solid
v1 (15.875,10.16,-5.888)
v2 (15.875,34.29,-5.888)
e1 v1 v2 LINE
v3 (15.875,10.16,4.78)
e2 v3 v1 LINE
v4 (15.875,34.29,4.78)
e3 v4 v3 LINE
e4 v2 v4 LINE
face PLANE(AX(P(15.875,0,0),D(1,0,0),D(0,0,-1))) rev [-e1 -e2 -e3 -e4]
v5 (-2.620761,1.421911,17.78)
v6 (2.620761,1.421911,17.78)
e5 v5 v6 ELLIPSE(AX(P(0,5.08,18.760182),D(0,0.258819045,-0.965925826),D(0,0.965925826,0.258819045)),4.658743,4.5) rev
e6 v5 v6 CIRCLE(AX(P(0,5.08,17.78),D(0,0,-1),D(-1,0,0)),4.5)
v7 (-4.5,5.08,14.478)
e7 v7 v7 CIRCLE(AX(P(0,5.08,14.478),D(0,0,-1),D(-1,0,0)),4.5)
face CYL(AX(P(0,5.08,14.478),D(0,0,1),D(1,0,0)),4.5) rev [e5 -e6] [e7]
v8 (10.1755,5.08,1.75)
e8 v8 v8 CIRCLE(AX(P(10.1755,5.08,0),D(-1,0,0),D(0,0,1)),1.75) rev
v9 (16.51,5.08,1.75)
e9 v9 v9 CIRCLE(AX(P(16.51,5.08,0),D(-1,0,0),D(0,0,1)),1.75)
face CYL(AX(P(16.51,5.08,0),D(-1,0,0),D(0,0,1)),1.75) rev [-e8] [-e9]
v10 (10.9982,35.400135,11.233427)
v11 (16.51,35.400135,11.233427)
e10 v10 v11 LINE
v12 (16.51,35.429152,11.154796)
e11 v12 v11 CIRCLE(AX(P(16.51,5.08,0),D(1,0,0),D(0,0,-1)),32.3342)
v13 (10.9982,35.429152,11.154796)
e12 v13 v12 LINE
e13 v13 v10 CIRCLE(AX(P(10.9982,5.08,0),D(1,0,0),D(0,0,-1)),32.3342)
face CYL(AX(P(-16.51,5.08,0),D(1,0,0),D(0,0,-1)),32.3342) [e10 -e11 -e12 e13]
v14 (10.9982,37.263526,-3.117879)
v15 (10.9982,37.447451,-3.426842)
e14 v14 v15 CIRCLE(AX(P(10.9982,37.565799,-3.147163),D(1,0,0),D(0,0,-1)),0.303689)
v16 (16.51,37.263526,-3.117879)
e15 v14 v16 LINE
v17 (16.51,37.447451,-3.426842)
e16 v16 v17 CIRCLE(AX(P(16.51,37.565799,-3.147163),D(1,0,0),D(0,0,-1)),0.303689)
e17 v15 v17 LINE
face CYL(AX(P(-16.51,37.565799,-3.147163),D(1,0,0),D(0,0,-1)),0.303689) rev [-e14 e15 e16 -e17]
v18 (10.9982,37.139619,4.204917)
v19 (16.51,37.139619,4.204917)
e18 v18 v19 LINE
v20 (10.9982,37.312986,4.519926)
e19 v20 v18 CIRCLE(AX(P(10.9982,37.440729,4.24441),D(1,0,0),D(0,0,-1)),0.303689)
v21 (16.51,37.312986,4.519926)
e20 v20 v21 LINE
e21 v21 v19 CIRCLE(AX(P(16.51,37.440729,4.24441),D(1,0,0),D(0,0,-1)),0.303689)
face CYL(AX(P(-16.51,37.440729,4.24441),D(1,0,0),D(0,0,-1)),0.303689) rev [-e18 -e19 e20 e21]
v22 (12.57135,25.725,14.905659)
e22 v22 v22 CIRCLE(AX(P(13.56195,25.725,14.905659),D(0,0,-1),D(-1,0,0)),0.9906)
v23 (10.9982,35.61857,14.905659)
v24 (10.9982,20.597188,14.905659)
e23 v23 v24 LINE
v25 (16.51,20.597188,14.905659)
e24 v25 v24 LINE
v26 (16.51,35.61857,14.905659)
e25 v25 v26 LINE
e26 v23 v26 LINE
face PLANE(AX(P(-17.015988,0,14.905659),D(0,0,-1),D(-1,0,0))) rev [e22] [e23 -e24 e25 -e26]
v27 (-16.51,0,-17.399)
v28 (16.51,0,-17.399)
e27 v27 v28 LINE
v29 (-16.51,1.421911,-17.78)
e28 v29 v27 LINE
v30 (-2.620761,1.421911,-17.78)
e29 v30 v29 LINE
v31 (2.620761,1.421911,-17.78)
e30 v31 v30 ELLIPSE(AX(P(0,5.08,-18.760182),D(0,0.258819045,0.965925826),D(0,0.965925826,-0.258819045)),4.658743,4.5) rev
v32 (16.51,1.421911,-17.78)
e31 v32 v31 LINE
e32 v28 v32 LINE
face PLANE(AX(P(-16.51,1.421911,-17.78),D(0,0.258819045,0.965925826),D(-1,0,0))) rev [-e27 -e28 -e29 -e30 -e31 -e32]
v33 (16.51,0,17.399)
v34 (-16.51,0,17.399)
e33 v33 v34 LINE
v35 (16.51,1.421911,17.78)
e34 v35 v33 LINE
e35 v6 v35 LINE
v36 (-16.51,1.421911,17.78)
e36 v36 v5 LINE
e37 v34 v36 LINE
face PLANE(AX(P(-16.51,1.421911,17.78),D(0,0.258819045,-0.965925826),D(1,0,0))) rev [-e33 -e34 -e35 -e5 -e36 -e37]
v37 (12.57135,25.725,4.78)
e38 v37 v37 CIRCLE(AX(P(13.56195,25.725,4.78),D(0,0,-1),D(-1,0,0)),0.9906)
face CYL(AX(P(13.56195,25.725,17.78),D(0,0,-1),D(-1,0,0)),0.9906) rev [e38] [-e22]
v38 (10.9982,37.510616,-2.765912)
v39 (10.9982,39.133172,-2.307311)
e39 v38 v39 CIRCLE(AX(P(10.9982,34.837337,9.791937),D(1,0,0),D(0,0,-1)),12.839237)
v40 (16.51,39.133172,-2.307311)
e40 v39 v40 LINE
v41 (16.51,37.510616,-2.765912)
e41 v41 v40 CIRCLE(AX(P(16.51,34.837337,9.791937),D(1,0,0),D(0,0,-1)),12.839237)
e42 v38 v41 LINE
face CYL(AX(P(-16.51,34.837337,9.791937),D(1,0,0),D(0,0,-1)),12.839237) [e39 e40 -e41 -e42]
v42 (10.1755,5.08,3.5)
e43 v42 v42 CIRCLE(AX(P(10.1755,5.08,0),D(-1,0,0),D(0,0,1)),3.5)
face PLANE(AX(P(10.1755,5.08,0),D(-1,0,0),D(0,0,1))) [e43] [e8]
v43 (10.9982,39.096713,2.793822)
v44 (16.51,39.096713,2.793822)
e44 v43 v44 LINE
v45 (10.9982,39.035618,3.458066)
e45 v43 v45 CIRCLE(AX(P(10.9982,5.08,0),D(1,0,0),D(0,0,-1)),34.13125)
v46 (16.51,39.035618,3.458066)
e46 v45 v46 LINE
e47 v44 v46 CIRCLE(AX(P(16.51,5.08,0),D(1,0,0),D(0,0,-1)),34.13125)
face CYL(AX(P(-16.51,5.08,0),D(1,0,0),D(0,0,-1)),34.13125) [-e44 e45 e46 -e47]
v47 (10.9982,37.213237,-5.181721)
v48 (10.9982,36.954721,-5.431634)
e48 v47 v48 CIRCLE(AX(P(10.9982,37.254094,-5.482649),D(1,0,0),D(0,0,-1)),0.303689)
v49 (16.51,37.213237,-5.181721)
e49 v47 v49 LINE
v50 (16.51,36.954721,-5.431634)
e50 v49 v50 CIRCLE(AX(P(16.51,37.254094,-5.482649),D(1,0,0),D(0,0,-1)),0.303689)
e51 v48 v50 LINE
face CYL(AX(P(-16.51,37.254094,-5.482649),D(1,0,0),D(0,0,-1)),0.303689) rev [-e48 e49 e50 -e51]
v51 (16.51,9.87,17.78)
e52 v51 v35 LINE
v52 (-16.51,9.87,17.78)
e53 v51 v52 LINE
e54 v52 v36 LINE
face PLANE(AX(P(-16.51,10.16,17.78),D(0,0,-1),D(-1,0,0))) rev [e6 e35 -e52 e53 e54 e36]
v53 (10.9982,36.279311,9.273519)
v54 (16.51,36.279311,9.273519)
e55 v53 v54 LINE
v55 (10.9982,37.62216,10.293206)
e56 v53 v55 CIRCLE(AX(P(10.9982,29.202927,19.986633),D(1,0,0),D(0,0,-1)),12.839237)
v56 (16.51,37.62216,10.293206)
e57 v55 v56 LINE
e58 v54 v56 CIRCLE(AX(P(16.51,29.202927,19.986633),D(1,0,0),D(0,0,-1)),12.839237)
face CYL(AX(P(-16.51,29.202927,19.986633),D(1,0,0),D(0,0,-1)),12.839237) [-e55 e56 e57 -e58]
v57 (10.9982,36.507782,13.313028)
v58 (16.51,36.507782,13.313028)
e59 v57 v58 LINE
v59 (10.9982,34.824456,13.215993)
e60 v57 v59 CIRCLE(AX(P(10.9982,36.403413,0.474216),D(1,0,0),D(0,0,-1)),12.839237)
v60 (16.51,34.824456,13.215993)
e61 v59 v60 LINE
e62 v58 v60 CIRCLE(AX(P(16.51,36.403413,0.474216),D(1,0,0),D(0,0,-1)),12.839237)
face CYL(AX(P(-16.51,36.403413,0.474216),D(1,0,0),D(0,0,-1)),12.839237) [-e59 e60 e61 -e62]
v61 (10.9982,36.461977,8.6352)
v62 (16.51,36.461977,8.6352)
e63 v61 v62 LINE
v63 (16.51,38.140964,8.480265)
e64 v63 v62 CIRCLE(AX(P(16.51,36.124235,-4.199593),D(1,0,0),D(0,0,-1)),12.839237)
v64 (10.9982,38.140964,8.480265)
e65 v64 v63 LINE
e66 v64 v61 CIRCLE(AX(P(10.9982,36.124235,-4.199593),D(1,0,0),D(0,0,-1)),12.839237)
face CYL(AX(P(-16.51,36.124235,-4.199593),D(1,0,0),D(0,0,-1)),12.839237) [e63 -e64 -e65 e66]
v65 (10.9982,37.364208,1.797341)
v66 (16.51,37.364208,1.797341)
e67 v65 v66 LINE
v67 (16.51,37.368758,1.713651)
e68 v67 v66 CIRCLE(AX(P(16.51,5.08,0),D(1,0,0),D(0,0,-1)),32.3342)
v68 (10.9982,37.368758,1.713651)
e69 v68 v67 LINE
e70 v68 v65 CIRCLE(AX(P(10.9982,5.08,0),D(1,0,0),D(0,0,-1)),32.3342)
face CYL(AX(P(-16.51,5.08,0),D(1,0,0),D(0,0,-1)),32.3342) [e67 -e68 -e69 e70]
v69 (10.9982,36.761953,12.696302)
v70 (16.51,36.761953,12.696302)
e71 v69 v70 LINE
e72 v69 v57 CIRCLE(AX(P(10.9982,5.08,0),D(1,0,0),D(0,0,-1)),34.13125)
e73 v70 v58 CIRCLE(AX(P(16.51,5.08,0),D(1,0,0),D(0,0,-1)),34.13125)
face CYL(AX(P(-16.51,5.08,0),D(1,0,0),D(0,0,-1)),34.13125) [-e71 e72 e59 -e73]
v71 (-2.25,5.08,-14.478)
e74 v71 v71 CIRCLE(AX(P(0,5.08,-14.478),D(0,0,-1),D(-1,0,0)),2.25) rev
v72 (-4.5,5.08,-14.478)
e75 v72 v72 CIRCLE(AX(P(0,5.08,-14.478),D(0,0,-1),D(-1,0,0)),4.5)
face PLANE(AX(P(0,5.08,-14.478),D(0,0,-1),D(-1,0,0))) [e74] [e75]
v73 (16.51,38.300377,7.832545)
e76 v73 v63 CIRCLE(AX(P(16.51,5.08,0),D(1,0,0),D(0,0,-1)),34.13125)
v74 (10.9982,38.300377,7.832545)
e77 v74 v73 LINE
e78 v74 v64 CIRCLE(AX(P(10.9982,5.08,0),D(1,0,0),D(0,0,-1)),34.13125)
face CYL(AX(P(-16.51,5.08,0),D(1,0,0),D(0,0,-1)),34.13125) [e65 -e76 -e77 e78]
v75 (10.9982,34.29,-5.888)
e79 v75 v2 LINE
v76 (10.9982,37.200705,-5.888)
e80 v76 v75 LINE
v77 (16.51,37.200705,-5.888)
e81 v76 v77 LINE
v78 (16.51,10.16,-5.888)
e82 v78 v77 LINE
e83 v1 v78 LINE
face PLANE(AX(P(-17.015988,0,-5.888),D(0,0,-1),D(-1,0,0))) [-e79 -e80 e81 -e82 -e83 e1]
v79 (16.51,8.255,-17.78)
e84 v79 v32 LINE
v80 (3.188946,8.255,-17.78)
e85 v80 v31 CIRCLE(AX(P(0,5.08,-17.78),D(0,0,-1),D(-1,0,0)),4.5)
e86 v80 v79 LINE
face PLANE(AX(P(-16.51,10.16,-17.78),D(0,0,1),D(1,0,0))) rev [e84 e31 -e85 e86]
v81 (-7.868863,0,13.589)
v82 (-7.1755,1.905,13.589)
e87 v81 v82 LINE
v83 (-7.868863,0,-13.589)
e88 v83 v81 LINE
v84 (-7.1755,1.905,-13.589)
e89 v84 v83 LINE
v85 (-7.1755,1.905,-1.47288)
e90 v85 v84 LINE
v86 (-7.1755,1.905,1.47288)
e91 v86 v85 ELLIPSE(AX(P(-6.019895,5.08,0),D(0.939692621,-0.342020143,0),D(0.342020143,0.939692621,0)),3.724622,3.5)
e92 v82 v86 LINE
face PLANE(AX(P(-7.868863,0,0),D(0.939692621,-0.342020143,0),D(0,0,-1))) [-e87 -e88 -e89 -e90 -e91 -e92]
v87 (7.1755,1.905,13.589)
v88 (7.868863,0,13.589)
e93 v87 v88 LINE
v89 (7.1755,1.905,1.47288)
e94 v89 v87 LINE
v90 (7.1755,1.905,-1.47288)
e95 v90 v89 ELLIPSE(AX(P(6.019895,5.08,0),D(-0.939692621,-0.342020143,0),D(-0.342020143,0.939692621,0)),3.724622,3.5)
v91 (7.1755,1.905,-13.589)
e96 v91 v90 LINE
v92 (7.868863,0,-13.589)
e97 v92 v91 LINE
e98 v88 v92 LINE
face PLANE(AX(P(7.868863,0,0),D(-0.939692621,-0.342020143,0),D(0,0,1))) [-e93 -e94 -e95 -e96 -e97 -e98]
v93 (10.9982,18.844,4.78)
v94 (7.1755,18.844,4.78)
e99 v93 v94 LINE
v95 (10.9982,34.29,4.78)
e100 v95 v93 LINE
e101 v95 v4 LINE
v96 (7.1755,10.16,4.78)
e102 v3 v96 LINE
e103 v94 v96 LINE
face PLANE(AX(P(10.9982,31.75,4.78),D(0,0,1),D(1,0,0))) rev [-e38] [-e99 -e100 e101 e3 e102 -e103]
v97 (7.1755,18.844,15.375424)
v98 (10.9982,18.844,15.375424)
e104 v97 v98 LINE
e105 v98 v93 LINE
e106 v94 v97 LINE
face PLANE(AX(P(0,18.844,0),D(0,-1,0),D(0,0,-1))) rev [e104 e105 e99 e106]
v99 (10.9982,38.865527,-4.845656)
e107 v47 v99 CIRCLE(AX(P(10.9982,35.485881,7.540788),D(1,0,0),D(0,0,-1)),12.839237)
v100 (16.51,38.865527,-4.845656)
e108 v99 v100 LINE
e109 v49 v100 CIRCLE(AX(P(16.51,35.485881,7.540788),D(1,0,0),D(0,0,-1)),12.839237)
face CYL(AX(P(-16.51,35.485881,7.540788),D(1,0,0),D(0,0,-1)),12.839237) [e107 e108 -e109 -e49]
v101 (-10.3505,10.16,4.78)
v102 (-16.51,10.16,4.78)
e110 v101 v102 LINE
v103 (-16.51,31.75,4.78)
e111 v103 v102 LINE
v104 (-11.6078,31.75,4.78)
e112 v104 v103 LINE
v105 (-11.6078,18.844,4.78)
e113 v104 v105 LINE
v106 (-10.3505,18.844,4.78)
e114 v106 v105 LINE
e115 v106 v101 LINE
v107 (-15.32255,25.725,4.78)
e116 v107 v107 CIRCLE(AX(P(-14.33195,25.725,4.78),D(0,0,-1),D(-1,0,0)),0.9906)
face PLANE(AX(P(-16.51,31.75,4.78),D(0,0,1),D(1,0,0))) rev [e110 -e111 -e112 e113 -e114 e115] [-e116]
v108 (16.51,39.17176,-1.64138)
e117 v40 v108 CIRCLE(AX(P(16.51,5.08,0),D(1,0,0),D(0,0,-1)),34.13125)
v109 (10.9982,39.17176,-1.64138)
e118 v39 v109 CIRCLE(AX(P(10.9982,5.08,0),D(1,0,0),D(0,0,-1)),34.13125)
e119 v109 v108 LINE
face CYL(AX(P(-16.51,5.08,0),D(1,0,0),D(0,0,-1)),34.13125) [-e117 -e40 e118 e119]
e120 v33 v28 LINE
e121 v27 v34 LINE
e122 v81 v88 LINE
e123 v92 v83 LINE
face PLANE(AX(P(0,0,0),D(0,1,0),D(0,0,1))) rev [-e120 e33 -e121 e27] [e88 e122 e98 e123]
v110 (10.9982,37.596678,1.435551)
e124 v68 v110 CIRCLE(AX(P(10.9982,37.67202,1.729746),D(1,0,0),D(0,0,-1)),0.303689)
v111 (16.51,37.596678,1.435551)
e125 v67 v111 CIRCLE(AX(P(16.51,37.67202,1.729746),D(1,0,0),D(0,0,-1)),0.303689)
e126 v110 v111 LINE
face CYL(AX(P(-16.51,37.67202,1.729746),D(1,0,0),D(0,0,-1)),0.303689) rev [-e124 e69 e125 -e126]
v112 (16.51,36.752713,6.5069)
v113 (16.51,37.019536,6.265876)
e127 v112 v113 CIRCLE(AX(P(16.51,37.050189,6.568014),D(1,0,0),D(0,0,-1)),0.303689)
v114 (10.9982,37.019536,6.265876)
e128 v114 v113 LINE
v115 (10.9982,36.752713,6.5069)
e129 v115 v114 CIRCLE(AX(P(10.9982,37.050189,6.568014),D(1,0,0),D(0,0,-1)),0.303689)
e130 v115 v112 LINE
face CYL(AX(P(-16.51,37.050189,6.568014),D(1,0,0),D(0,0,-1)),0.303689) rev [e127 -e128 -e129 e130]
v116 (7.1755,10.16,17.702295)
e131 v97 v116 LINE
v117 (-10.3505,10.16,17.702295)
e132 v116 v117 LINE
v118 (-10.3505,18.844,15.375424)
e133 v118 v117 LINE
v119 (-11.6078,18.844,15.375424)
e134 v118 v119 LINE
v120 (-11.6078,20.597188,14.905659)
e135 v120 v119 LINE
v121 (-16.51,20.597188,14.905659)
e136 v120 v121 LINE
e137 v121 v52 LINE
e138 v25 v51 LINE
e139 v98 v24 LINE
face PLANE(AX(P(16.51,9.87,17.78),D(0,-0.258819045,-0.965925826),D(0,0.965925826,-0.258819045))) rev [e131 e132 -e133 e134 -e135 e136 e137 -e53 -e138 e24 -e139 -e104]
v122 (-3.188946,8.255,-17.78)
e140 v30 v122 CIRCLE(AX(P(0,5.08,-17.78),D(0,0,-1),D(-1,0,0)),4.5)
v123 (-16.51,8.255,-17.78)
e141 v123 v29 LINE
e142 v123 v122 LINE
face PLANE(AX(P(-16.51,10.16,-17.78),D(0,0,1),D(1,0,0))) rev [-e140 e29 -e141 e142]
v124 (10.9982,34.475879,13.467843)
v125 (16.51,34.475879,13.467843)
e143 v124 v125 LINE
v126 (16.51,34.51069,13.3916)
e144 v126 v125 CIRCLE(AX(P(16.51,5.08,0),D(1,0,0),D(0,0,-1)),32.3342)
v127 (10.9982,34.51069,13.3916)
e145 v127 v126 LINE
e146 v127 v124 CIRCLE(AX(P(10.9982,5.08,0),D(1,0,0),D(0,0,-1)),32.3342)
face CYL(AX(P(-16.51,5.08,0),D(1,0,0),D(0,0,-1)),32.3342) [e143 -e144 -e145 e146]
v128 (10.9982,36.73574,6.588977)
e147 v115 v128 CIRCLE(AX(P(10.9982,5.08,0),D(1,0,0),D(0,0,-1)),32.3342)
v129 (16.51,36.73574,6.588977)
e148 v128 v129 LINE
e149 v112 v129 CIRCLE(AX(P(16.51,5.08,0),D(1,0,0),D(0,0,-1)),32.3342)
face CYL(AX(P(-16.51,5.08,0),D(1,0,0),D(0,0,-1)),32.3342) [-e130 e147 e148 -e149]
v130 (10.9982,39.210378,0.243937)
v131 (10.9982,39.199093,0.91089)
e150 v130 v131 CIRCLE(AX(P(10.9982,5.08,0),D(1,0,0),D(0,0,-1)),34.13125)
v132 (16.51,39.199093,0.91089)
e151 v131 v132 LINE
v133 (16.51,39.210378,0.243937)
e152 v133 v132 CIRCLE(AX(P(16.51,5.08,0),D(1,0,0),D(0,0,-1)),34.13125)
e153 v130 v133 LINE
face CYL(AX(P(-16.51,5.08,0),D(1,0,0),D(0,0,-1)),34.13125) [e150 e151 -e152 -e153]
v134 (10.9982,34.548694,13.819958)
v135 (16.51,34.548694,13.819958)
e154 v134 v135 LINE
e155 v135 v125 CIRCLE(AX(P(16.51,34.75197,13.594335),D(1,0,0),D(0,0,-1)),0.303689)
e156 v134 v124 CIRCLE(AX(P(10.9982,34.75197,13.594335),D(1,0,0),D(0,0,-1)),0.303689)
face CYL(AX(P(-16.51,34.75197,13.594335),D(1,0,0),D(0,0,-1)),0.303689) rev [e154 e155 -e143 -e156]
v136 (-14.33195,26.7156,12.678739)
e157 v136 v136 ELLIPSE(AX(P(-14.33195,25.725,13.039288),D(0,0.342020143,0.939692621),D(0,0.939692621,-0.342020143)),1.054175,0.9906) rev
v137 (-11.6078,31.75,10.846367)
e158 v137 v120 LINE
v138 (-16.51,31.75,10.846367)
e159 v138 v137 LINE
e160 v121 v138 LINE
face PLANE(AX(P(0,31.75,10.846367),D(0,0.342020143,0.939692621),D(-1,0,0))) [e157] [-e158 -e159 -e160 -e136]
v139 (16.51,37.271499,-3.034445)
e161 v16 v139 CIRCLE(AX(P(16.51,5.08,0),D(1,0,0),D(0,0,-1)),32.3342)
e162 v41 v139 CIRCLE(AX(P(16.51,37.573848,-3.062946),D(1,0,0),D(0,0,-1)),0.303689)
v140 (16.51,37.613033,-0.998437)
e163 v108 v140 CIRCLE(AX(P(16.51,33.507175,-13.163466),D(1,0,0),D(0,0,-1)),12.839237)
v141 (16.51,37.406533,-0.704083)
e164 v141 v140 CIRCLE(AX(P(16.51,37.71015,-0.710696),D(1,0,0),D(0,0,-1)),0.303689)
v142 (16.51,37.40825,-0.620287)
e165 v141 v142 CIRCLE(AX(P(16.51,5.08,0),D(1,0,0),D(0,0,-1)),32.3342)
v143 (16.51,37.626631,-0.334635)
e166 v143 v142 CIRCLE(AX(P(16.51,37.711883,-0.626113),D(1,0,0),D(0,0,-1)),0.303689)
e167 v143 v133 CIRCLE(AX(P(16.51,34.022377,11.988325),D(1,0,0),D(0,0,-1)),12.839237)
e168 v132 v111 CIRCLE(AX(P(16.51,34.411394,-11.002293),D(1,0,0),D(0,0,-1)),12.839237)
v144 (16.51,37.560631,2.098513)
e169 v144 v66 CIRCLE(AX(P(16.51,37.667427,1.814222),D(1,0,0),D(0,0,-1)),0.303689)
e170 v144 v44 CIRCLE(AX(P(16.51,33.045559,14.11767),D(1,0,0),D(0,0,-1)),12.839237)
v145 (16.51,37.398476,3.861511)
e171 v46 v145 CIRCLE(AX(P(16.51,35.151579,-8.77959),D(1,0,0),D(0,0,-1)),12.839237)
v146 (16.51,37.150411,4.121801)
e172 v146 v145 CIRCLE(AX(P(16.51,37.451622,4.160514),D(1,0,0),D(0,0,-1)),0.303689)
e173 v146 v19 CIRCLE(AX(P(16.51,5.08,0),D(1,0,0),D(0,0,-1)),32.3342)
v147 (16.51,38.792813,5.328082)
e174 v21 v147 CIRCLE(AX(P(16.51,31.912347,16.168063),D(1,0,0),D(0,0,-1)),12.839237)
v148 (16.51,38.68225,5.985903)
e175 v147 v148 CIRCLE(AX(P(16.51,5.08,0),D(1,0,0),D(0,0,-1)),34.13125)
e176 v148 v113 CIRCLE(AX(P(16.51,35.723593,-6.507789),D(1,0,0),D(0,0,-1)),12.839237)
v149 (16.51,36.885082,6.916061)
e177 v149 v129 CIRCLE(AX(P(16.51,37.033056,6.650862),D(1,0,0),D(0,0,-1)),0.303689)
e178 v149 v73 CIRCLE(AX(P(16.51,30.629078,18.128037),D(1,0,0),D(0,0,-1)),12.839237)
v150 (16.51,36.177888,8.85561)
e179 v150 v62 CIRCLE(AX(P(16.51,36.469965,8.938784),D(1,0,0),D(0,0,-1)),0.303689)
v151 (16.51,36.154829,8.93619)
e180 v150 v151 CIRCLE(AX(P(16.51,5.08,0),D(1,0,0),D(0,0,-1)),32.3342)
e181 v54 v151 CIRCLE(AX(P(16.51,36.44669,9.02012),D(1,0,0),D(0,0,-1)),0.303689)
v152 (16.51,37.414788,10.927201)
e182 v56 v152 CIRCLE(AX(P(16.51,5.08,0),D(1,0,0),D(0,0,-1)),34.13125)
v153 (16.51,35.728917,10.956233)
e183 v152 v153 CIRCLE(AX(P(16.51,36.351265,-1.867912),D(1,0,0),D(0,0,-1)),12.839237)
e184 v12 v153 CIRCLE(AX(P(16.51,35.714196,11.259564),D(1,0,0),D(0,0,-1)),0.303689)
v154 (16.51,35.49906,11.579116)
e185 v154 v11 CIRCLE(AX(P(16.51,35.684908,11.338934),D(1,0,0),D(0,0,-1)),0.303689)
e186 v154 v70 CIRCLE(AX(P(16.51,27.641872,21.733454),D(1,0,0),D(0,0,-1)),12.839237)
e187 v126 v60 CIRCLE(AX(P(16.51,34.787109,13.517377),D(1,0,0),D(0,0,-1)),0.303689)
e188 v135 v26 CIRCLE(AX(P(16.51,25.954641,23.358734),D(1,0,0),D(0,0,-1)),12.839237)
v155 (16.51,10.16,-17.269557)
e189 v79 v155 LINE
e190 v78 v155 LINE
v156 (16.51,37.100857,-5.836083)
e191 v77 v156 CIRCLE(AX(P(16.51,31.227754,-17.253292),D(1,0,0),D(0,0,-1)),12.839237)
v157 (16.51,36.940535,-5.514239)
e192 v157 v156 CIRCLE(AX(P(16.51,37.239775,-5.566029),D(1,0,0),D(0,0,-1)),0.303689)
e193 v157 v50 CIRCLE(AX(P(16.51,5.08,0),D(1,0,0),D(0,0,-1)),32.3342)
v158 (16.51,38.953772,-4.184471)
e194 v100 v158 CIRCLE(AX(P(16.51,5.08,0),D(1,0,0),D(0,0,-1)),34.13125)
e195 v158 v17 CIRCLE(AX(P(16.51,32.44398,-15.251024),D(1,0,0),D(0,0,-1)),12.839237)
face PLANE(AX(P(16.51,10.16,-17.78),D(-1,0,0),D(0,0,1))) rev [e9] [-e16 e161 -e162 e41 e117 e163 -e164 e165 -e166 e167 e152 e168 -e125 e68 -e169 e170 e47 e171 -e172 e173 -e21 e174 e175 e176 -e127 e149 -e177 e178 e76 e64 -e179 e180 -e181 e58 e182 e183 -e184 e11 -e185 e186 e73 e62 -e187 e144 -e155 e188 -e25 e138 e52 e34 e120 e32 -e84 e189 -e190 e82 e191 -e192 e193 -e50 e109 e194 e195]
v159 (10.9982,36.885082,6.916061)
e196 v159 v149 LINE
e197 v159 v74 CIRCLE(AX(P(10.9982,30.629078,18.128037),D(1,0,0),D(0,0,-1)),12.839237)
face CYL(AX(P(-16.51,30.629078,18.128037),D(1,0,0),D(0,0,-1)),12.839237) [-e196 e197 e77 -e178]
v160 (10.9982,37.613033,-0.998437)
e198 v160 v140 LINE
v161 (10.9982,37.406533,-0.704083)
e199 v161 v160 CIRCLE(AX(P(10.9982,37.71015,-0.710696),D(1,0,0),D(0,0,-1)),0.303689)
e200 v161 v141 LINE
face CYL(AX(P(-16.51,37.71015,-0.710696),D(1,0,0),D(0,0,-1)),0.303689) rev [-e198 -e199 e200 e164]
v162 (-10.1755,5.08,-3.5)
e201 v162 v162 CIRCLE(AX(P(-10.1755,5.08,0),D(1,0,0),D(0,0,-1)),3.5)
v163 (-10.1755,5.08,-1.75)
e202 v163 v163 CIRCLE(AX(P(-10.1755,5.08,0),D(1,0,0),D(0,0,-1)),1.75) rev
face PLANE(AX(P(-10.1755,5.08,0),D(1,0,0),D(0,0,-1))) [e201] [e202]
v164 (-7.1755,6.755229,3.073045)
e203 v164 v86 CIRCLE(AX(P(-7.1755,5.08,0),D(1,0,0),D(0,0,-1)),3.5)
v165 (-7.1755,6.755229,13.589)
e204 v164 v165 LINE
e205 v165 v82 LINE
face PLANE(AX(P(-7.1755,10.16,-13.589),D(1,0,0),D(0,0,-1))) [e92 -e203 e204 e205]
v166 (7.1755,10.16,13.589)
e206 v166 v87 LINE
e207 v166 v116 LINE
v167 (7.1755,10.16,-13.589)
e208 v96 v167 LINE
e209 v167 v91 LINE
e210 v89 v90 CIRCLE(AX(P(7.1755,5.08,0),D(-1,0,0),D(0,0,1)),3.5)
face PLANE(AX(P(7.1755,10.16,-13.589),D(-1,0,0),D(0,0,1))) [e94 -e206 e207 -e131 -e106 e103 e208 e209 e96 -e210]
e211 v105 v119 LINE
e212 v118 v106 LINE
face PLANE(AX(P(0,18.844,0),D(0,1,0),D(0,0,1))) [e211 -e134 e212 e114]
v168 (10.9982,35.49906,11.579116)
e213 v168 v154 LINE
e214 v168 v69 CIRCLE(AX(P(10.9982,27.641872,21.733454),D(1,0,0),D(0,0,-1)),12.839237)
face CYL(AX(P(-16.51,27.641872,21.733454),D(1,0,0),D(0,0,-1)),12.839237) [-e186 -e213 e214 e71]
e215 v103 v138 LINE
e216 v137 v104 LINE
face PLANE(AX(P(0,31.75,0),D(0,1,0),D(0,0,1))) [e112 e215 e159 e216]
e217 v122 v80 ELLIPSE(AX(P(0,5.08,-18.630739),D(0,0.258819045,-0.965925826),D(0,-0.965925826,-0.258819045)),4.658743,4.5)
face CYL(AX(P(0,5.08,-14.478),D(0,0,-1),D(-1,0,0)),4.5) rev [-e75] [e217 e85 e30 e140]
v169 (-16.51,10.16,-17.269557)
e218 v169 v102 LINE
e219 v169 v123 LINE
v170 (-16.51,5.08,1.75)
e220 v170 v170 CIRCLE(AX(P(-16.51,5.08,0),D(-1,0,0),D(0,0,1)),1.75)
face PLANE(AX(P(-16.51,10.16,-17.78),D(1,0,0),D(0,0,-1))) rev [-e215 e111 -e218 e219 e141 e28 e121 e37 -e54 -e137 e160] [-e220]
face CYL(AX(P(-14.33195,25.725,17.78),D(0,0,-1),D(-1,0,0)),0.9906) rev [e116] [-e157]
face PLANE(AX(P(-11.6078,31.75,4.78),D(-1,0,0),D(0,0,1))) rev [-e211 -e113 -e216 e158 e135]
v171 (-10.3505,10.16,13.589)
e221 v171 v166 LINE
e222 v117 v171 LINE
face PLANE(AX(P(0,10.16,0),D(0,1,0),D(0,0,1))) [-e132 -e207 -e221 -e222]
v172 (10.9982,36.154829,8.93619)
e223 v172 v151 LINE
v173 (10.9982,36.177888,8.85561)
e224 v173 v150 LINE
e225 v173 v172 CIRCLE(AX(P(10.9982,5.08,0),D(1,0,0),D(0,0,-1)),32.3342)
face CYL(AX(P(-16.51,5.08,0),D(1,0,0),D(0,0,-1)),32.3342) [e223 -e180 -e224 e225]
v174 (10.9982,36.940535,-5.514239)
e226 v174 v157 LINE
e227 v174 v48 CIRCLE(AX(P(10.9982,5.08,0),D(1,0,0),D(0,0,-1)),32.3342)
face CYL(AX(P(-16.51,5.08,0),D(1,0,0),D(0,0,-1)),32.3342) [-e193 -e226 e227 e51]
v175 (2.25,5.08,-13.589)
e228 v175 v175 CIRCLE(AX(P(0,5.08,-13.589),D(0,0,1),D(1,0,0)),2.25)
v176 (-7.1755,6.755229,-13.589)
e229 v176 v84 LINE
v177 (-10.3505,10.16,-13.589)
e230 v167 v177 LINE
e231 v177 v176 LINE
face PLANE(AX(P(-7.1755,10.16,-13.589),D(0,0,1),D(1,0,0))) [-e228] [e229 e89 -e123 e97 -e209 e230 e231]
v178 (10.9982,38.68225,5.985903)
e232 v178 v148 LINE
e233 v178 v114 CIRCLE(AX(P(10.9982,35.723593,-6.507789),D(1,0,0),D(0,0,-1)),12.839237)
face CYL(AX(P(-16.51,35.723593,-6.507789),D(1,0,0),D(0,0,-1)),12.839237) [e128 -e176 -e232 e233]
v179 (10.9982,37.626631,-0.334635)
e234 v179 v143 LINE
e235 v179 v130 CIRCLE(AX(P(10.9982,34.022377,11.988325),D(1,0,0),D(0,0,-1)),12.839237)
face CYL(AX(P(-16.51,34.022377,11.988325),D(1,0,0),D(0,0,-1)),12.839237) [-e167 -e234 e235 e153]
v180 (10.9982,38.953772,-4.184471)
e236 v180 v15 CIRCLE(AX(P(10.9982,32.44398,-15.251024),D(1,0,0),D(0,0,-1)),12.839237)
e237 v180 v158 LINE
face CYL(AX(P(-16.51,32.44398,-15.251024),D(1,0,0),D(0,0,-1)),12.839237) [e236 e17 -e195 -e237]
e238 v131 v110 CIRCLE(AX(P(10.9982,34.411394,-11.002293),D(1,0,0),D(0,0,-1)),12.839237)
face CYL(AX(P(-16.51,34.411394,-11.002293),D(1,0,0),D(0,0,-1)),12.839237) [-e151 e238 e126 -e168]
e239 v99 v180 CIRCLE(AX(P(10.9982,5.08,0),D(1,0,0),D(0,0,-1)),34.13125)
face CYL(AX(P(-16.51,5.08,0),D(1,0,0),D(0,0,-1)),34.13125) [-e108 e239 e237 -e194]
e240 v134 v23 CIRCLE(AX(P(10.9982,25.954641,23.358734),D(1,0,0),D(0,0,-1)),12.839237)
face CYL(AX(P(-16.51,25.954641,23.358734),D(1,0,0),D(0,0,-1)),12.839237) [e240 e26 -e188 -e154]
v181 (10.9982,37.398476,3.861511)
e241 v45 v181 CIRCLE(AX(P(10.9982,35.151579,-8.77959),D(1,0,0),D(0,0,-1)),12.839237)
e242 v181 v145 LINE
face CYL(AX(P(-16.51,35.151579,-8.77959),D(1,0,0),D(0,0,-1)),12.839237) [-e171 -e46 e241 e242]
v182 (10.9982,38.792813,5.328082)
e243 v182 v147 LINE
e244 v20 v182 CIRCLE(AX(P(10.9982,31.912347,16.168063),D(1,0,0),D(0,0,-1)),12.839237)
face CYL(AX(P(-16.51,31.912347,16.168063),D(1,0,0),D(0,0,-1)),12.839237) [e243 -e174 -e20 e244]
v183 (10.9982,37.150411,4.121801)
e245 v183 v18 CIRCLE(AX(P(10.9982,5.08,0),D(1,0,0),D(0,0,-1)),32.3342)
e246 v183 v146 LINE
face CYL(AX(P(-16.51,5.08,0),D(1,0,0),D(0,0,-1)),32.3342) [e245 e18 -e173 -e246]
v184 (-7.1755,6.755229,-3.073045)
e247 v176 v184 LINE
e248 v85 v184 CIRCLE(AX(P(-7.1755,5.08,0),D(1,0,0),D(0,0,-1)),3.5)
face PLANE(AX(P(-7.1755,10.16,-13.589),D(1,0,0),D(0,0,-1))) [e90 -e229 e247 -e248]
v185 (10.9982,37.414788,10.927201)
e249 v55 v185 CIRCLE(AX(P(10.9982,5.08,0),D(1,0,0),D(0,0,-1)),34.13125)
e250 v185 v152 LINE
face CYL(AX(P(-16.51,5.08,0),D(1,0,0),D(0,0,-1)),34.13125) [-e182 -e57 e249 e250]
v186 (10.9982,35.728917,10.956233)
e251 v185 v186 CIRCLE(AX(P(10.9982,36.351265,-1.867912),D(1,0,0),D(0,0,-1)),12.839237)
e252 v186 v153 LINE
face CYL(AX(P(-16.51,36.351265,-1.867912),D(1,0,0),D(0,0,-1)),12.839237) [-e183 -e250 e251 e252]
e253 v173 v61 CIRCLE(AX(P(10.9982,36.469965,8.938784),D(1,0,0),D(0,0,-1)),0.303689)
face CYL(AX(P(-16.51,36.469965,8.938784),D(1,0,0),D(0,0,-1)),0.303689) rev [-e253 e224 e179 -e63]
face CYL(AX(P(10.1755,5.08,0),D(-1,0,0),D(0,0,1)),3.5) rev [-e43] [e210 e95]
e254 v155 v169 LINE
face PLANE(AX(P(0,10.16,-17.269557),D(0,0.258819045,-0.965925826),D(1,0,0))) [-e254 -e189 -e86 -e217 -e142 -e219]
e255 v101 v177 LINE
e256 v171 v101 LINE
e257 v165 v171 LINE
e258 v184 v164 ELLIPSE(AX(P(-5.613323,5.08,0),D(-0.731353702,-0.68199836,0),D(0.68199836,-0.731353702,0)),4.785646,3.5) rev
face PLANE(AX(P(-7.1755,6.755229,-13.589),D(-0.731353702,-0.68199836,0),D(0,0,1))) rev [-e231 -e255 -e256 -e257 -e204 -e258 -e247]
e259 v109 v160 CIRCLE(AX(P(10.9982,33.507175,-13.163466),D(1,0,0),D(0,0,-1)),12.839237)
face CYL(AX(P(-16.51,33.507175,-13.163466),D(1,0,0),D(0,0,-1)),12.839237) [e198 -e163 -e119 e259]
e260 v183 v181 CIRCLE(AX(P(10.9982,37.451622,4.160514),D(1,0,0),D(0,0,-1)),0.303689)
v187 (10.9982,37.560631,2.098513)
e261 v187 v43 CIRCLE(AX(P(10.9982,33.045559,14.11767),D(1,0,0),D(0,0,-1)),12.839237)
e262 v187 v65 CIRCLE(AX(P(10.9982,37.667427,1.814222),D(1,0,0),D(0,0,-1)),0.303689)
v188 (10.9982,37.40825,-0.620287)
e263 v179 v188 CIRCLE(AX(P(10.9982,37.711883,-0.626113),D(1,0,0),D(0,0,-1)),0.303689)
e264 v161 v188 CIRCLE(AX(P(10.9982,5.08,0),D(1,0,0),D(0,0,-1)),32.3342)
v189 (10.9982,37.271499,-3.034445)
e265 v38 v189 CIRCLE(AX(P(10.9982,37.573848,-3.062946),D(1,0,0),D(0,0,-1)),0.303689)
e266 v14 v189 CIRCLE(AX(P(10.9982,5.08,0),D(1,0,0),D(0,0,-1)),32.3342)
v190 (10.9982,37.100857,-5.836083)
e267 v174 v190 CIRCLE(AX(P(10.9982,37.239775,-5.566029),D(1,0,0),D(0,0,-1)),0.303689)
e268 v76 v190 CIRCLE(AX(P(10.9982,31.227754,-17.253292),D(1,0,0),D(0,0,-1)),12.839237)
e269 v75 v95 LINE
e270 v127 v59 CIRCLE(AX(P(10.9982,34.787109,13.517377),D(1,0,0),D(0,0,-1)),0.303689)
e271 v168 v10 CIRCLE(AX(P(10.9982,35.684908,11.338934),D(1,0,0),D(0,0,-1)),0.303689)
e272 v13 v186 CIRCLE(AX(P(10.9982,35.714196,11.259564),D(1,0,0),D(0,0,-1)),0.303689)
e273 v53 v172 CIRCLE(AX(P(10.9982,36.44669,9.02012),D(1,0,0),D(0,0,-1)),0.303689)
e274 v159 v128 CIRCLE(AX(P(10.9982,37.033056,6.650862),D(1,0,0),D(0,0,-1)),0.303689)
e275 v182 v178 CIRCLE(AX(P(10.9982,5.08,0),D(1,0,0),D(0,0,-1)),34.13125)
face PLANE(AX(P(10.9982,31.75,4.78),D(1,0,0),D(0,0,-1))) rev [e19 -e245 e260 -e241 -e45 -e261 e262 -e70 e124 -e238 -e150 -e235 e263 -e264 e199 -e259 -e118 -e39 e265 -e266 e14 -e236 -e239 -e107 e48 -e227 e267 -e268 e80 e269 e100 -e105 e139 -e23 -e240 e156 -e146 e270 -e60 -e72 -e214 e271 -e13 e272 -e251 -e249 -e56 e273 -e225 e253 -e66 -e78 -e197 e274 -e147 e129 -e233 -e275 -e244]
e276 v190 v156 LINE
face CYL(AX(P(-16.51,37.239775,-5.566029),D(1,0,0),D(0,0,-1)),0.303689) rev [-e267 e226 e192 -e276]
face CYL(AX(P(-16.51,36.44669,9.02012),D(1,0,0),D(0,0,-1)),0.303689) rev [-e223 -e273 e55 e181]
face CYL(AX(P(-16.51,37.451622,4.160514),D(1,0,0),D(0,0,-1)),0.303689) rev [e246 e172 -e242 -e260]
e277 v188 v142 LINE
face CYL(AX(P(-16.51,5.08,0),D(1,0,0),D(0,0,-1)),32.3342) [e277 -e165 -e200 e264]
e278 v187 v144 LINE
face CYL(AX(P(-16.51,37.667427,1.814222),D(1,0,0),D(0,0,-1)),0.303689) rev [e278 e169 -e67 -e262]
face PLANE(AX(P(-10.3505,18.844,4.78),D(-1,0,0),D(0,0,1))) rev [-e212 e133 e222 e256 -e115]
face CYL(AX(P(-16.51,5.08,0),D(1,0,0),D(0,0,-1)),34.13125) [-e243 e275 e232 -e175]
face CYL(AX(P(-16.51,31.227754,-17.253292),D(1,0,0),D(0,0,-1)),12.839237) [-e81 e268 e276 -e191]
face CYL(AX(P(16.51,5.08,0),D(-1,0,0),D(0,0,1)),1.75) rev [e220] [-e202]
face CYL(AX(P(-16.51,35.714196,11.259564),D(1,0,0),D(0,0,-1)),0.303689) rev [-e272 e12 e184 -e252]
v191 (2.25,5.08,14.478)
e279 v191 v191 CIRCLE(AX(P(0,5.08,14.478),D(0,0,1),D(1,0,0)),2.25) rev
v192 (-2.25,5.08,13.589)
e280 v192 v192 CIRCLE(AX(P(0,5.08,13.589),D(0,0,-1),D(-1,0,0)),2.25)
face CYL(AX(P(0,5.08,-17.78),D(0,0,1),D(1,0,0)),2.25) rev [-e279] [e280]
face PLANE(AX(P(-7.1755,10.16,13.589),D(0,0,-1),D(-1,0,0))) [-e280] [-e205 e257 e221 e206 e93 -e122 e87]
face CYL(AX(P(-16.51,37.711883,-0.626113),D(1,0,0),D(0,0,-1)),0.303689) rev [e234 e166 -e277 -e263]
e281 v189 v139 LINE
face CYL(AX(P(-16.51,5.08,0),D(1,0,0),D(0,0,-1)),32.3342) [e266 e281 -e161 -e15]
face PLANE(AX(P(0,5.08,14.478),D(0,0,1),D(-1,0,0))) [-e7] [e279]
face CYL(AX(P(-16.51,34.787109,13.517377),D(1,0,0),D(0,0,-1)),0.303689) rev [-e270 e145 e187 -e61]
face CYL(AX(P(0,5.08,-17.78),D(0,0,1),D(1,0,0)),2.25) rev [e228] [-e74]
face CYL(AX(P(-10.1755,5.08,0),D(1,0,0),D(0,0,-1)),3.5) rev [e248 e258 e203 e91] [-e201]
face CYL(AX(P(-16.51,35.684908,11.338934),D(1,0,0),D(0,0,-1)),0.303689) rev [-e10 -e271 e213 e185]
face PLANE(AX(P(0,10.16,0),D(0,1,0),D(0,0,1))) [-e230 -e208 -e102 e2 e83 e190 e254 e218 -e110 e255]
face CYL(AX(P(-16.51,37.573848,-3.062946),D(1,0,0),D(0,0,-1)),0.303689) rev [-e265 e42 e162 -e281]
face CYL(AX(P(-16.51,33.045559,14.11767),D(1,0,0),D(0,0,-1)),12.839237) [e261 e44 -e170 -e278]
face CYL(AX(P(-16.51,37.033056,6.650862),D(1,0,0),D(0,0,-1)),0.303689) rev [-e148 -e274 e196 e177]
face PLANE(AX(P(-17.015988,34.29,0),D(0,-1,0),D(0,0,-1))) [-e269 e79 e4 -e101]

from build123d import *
from OCP.BRepFilletAPI import BRepFilletAPI_MakeChamfer

# Parameters (mm, degrees)
SKETCH1_W           = 33.02
SKETCH1_H           = 35.56
SKETCH1_W_2         = 14.351
SKETCH1_H_2         = 27.178
BOSS_EXTRUDE1_DEPTH = 10.16
SKETCH2_R           = 2.25
CUT_EXTRUDE1_DEPTH  = 41.500855547
SKETCH3_R           = 1.75
CUT_EXTRUDE2_DEPTH  = 39.854528694
SKETCH8_R           = 4.5
CUT_EXTRUDE5_DEPTH  = 3.302
SKETCH4_W           = 4.9022
SKETCH4_H           = 13
SKETCH4_W_2         = 5.5118
BOSS_EXTRUDE2_DEPTH = 21.59
CHAMFER5_SIZE       = 3.175
CHAMFER5_SIZE_2     = 3.404770654
SKETCH15_W          = 1.2573
SKETCH15_H          = 13
SKETCH15_W_2        = 3.8227
BOSS_EXTRUDE3_DEPTH = 8.684
CHAMFER7_SIZE       = 1.905
CHAMFER7_SIZE2      = 0.693363296
SKETCH16_R          = 0.9906
CUT_EXTRUDE6_DEPTH  = 43.303619231
CHAMFER8_SIZE       = 19.05
CHAMFER8_SIZE_2     = 6.933632963
CHAMFER9_SIZE       = 0.381
CHAMFER9_SIZE_2     = 1.421911358
CHAMFER10_SIZE      = 0.510443212
CHAMFER10_SIZE_2    = 1.905
CUT_EXTRUDE7_DEPTH  = 50.13767699
BOSS_EXTRUDE4_DEPTH = 5.5118
CUT_EXTRUDE8_START  = -5.5118
CUT_EXTRUDE8_DEPTH  = 5.5118
SKETCH20_W          = 10.668
SKETCH20_H          = 24.13
BOSS_EXTRUDE5_DEPTH = 0.635
SKETCH25_R          = 0.9906
CUT_EXTRUDE12_DEPTH = 49.155866355
SKETCH26_R          = 3.5
CUT_EXTRUDE13_DEPTH = 3
CUT_EXTRUDE15_START = -3
SKETCH27_R          = 3.5
CUT_EXTRUDE15_DEPTH = 3


# Read off the part's stored shape, not the designer's step: Cut-Extrude8
with BuildPart() as part:
    # Sketch1 → Boss-Extrude1 (new body)
    with BuildSketch(Plane(origin=(0, 0, 0), x_dir=(1, 0, 0), z_dir=(0, 1, 0))):
        Rectangle(SKETCH1_W, SKETCH1_H)
        Rectangle(SKETCH1_W_2, SKETCH1_H_2, mode=Mode.SUBTRACT)
    extrude(amount=BOSS_EXTRUDE1_DEPTH)

    # Sketch2 → Cut-Extrude1 (cut, through all)
    with BuildSketch(Plane.XY.offset(17.78)):
        with Locations((0, 5.08)):
            Circle(SKETCH2_R)
    extrude(amount=-CUT_EXTRUDE1_DEPTH, mode=Mode.SUBTRACT)

    # Sketch3 → Cut-Extrude2 (cut, through all)
    with BuildSketch(Plane.ZY.offset(16.51)):
        with Locations((0, 5.08)):
            Circle(SKETCH3_R)
    extrude(amount=-CUT_EXTRUDE2_DEPTH, mode=Mode.SUBTRACT)

    # Sketch8 → Cut-Extrude5 (cut)
    with BuildSketch(Plane(origin=(0, 0, -17.78), x_dir=(-1, 0, 0), z_dir=(0, 0, -1))):
        with Locations((0, 5.08)):
            Circle(SKETCH8_R)
    cut_extrude5 = extrude(amount=-CUT_EXTRUDE5_DEPTH, mode=Mode.SUBTRACT)

    # Sketch4 → Boss-Extrude2 (add)
    with BuildSketch(Plane(origin=(0, 10.16, 0), x_dir=(1, 0, 0), z_dir=(0, 1, 0))):
        with Locations((-14.0589, -11.28)):
            Rectangle(SKETCH4_W, SKETCH4_H)
        with Locations((13.7541, -11.28)):
            Rectangle(SKETCH4_W_2, SKETCH4_H)
    extrude(amount=BOSS_EXTRUDE2_DEPTH)

    # Mirror2: Cut-Extrude5 across plane
    add(cut_extrude5.mirror(Plane.XY), mode=Mode.SUBTRACT)

    # Chamfer5
    # the kernel refuses this chamfer: 3.404770654, 3.175 mm, written as the material it takes off along each edge
    with BuildSketch(Plane(origin=(-7.1755, 10.16, 13.589), x_dir=(-0.999535821028092, 0.03046543092913525, 0), z_dir=(0, 0, -1))) as chamfer5_piece_1:
        Polygon((CHAMFER5_SIZE * 0.999535821028, -CHAMFER5_SIZE * 0.0304654309291), (-CHAMFER5_SIZE_2 * 0.0304654309321, -CHAMFER5_SIZE_2 * 0.999535821124), (0, 0), align=None)
    extrude(amount=27.178, mode=Mode.SUBTRACT)

    # Sketch15 → Boss-Extrude3 (add)
    with BuildSketch(Plane(origin=(0, 10.16, 0), x_dir=(1, 0, 0), z_dir=(0, 1, 0))):
        with Locations((-10.97915, -11.28)):
            Rectangle(SKETCH15_W, SKETCH15_H)
        with Locations((9.08685, -11.28)):
            Rectangle(SKETCH15_W_2, SKETCH15_H)
    extrude(amount=BOSS_EXTRUDE3_DEPTH)

    # Chamfer7: one chamfer whose edges measure the first distance from different faces: ONE call of the kernel's chamfer builder (chamfer() names one face for all edges)
    chamfer7_edges_1 = [part.edges().sort_by_distance(p)[0] for p in [
        (7.1755, 0, 0),
    ]]
    chamfer7_side_1 = [part.faces().sort_by_distance(p)[0] for p in [
        (7.1755, 7.883558881, 3.356415217),
    ]]
    chamfer7_edges_2 = [part.edges().sort_by_distance(p)[0] for p in [
        (-7.1755, 0, 0),
    ]]
    chamfer7_side_2 = [part.faces().sort_by_distance(p)[0] for p in [
        (-7.1755, 3.284488003, 0),
    ]]
    chamfer7 = BRepFilletAPI_MakeChamfer(part.part.solid().wrapped)
    for e in chamfer7_edges_1:
        chamfer7.Add(CHAMFER7_SIZE, CHAMFER7_SIZE2, e.wrapped, chamfer7_side_1[0].wrapped)  # the first distance lies on this face
    for e in chamfer7_edges_2:
        chamfer7.Add(CHAMFER7_SIZE, CHAMFER7_SIZE2, e.wrapped, chamfer7_side_2[0].wrapped)  # the first distance lies on this face
    add(Compound.cast(chamfer7.Shape()), mode=Mode.REPLACE)

    # Sketch16 → Cut-Extrude6 (cut, through all)
    with BuildSketch(Plane(origin=(0, 0, 4.78), x_dir=(-1, 0, 0), z_dir=(0, 0, -1))):
        with Locations((14.33195, 25.725)):
            Circle(SKETCH16_R)
        with Locations((-13.56195, 25.725)):
            Circle(SKETCH16_R)
    extrude(amount=-CUT_EXTRUDE6_DEPTH, mode=Mode.SUBTRACT)

    # Chamfer8
    # the kernel refuses this chamfer: 19.05, 6.933632963 mm, written as the material it takes off along each edge
    with BuildSketch(Plane(origin=(65.929409655, 31.75, 17.78), x_dir=(0, -0.9999130865277315, 0.0131840581986459), z_dir=(-1, 0, 0))) as chamfer8_piece_1:
        Polygon((CHAMFER8_SIZE * 0.999913086528, -CHAMFER8_SIZE * 0.0131840581986), (-CHAMFER8_SIZE_2 * 0.0131840581982, -CHAMFER8_SIZE_2 * 0.999913086495), (0, 0), align=None)
    extrude(amount=104.35061931, mode=Mode.SUBTRACT)
    with BuildSketch(Plane(origin=(37.811609655, 31.75, 17.78), x_dir=(0, -0.9999130865277315, 0.0131840581986459), z_dir=(-1, 0, 0))) as chamfer8_piece_2:
        Polygon((CHAMFER8_SIZE * 0.999913086528, -CHAMFER8_SIZE * 0.0131840581986), (-CHAMFER8_SIZE_2 * 0.0131840581982, -CHAMFER8_SIZE_2 * 0.999913086495), (0, 0), align=None)
    extrude(amount=103.74101931, mode=Mode.SUBTRACT)

    # Chamfer9
    # the kernel refuses this chamfer: 1.421911358, 0.381 mm, written as the material it takes off along each edge
    with BuildSketch(Plane(origin=(20.202307893, 0, 17.78), x_dir=(0, -0.13751244702129156, -0.990500038825954), z_dir=(-1, 0, 0)), Plane(origin=(-20.202307893, 0, -17.78), x_dir=(0, -0.13751244702129156, 0.990500038825954), z_dir=(1, 0, 0))) as chamfer9_piece_1:
        Polygon((CHAMFER9_SIZE * 0.990500038826, -CHAMFER9_SIZE * 0.137512447021), (-CHAMFER9_SIZE_2 * 0.137512446991, -CHAMFER9_SIZE_2 * 0.990500038606), (0, 0), align=None)
    extrude(amount=40.404615787, mode=Mode.SUBTRACT)

    # Chamfer10
    # the kernel refuses this chamfer: 1.905, 0.510443212 mm, written as the material it takes off along each edge
    with BuildSketch(Plane(origin=(-21.456754591, 10.16, -17.78), x_dir=(0, 0.1375124470212896, 0.9905000388259544), z_dir=(1, 0, 0))) as chamfer10_piece_1:
        Polygon((CHAMFER10_SIZE * 0.990500038013, CHAMFER10_SIZE * 0.137512446908), (-CHAMFER10_SIZE_2 * 0.137512447021, CHAMFER10_SIZE_2 * 0.990500038826), (0, 0), align=None)
    extrude(amount=42.913509182, mode=Mode.SUBTRACT)

    # Sketch17 → Cut-Extrude7 (cut, through all)
    with BuildSketch(Plane.ZY.offset(16.51)):
        Polygon((17.78, 9.87), (14.905658652, 20.597187951), (17.78, 12.7), align=None)
    extrude(amount=-CUT_EXTRUDE7_DEPTH, mode=Mode.SUBTRACT)

    # Sketch18 → Boss-Extrude4 (add)
    with BuildSketch(Plane(origin=(16.51, 0, 0), x_dir=(0, 0, -1), z_dir=(1, 0, 0))):
        with BuildLine():
            Line((-10.846367037, 31.75), (-4.78, 31.75))
            Line((-4.78, 31.75), (-4.78, 34.29))
            Line((-4.78, 34.29), (5.888, 34.29))
            Line((5.888, 34.29), (5.888, 38.86069798))
            ThreePointArc((5.888, 38.86069798), (-4.736227999, 39.041334549), (-14.905658652, 35.960826416))
            Line((-14.905658652, 35.960826416), (-14.905658652, 20.597187951))
            Line((-14.905658652, 20.597187951), (-10.846367037, 31.75))
        make_face()
    extrude(amount=-BOSS_EXTRUDE4_DEPTH)

    # Cut-Extrude8 outline → Cut-Extrude8 (cut)
    with BuildSketch(Plane(origin=(16.51, 0, 0), x_dir=(0, 0, -1), z_dir=(1, 0, 0)).offset(CUT_EXTRUDE8_START)):
        with BuildLine():
            ThreePointArc((5.431634301, 36.954720994), (5.472941103, 36.947654531), (5.514238712, 36.940534538))
            ThreePointArc((5.514238712, 36.940534538), (5.701437928, 36.967944805), (5.836082728, 37.100856982))
            ThreePointArc((5.836082728, 37.100856982), (5.861931965, 37.150837884), (5.888, 37.200705018))
            Line((5.888, 37.200705018), (5.888, 38.86069798))
            ThreePointArc((5.888, 38.86069798), (-4.736227999, 39.041334549), (-14.905658652, 35.960826416))
            Line((-14.905658652, 35.960826416), (-14.905658652, 35.618569571))
            ThreePointArc((-14.905658652, 35.618569571), (-14.346917288, 35.099757597), (-13.819957647, 34.548693797))
            ThreePointArc((-13.819957647, 34.548693797), (-13.655834746, 34.454573966), (-13.467842814, 34.475878956))
            ThreePointArc((-13.467842814, 34.475878956), (-13.429732852, 34.49330932), (-13.391600332, 34.510690277))
            ThreePointArc((-13.391600332, 34.510690277), (-13.252369834, 34.638790775), (-13.215993174, 34.824456086))
            ThreePointArc((-13.215993174, 34.824456086), (-13.292173518, 35.664524627), (-13.31302819, 36.507782406))
            ThreePointArc((-13.31302819, 36.507782406), (-13.005286181, 36.636374283), (-12.696302289, 36.761952824))
            ThreePointArc((-12.696302289, 36.761952824), (-12.116955476, 36.148865662), (-11.579115997, 35.49906008))
            ThreePointArc((-11.579115997, 35.49906008), (-11.422485601, 35.392938508), (-11.233427209, 35.40013527))
            ThreePointArc((-11.233427209, 35.40013527), (-11.194121237, 35.414668935), (-11.154796462, 35.429151644))
            ThreePointArc((-11.154796462, 35.429151644), (-11.006382319, 35.546489239), (-10.95623259, 35.728916961))
            ThreePointArc((-10.95623259, 35.728916961), (-10.969421517, 36.572329464), (-10.927201143, 37.414787795))
            ThreePointArc((-10.927201143, 37.414787795), (-10.610709959, 37.520022514), (-10.293205553, 37.622159517))
            ThreePointArc((-10.293205553, 37.622159517), (-9.761294773, 36.967492029), (-9.273519234, 36.279310641))
            ThreePointArc((-9.273519234, 36.279310641), (-9.125257283, 36.161780802), (-8.936189721, 36.154829089))
            ThreePointArc((-8.936189721, 36.154829089), (-8.895907555, 36.166384775), (-8.855610446, 36.177888244))
            ThreePointArc((-8.855610446, 36.177888244), (-8.69884265, 36.283806737), (-8.635200308, 36.46197666))
            ThreePointArc((-8.635200308, 36.46197666), (-8.585324061, 37.304016421), (-8.480264754, 38.140963934))
            ThreePointArc((-8.480264754, 38.140963934), (-8.156794344, 38.22225298), (-7.832545037, 38.300377253))
            ThreePointArc((-7.832545037, 38.300377253), (-7.351044949, 37.607790605), (-6.916061189, 36.885082001))
            ThreePointArc((-6.916061189, 36.885082001), (-6.776996825, 36.75680117), (-6.588977437, 36.735739858))
            ThreePointArc((-6.588977437, 36.735739858), (-6.547944351, 36.744252943), (-6.506900265, 36.752712839))
            ThreePointArc((-6.506900265, 36.752712839), (-6.342655524, 36.846619889), (-6.265876484, 37.019535615))
            ThreePointArc((-6.265876484, 37.019535615), (-6.153213991, 37.855493605), (-5.985903285, 38.682249752))
            ThreePointArc((-5.985903285, 38.682249752), (-5.657262626, 38.739138523), (-5.328081751, 38.792813164))
            ThreePointArc((-5.328081751, 38.792813164), (-4.8996851, 38.066180583), (-4.519925725, 37.312986441))
            ThreePointArc((-4.519925725, 37.312986441), (-4.390836651, 37.174672016), (-4.204916917, 37.13961889))
            ThreePointArc((-4.204916917, 37.13961889), (-4.163362384, 37.145041764), (-4.121800857, 37.150410776))
            ThreePointArc((-4.121800857, 37.150410776), (-3.950997695, 37.231781218), (-3.861511337, 37.398475732))
            ThreePointArc((-3.861511337, 37.398475732), (-3.686692652, 38.223676935), (-3.458066217, 39.03561816))
            ThreePointArc((-3.458066217, 39.03561816), (-3.1260932, 39.067788511), (-2.793821671, 39.096713348))
            ThreePointArc((-2.793821671, 39.096713348), (-2.420924225, 38.340098457), (-2.098513003, 37.560630946))
            ThreePointArc((-2.098513003, 37.560630946), (-1.980121139, 37.413056437), (-1.797340797, 37.364207528))
            ThreePointArc((-1.797340797, 37.364207528), (-1.755497206, 37.366509864), (-1.713650667, 37.368757967))
            ThreePointArc((-1.713650667, 37.368757967), (-1.537244285, 37.437136745), (-1.435551052, 37.596677823))
            ThreePointArc((-1.435551052, 37.596677823), (-1.199553833, 38.406507379), (-0.91089024, 39.199092976))
            ThreePointArc((-0.91089024, 39.199092976), (-0.577441394, 39.206364998), (-0.243937407, 39.210378274))
            ThreePointArc((-0.243937407, 39.210378274), (0.07137544, 38.42801237), (0.334635456, 37.626630587))
            ThreePointArc((0.334635456, 37.626630587), (0.441668016, 37.470621292), (0.620286783, 37.408249782))
            ThreePointArc((0.620286783, 37.408249782), (0.662185424, 37.407418705), (0.704082952, 37.406533325))
            ThreePointArc((0.704082952, 37.406533325), (0.885106019, 37.461538037), (0.998437417, 37.613033461))
            ThreePointArc((0.998437417, 37.613033461), (1.294293378, 38.402962476), (1.641379805, 39.171759985))
            ThreePointArc((1.641379805, 39.171759985), (1.9744397, 39.15409301), (2.307311054, 39.133172279))
            ThreePointArc((2.307311054, 39.133172279), (2.563275946, 38.329430671), (2.765912497, 37.510616268))
            ThreePointArc((2.765912497, 37.510616268), (2.860987183, 37.347044653), (3.034445467, 37.271499349))
            ThreePointArc((3.034445467, 37.271499349), (3.076164844, 37.267539507), (3.117879054, 37.263525597))
            ThreePointArc((3.117879054, 37.263525597), (3.302506451, 37.304848633), (3.426842218, 37.447451179))
            ThreePointArc((3.426842218, 37.447451179), (3.780902376, 38.213062048), (4.184470589, 38.953772043))
            ThreePointArc((4.184470589, 38.953772043), (4.515278925, 38.911264871), (4.845656095, 38.865527132))
            ThreePointArc((4.845656095, 38.865527132), (5.040841572, 38.044904668), (5.181721433, 37.213236787))
            ThreePointArc((5.181721433, 37.213236787), (5.264306549, 37.043017612), (5.431634301, 36.954720994))
        make_face()
    extrude(amount=CUT_EXTRUDE8_DEPTH, mode=Mode.SUBTRACT)

    # Sketch20 → Boss-Extrude5 (add)
    with BuildSketch(Plane(origin=(16.51, 0, 0), x_dir=(0, 0, -1), z_dir=(1, 0, 0))):
        with Locations((0.554, 22.225)):
            Rectangle(SKETCH20_W, SKETCH20_H)
    extrude(amount=-BOSS_EXTRUDE5_DEPTH)

    # Sketch25 → Cut-Extrude12 (cut, through all)
    with BuildSketch(Plane(origin=(0, 0, 4.78), x_dir=(-1, 0, 0), z_dir=(0, 0, -1))):
        with Locations((-13.56195, 25.725)):
            Circle(SKETCH25_R)
    extrude(amount=-CUT_EXTRUDE12_DEPTH, mode=Mode.SUBTRACT)

    # Sketch26 → Cut-Extrude13 (cut)
    with BuildSketch(Plane(origin=(-7.1755, 0, 0), x_dir=(0, 0, -1), z_dir=(1, 0, 0))):
        with Locations((0, 5.08)):
            Circle(SKETCH26_R)
    extrude(amount=-CUT_EXTRUDE13_DEPTH, mode=Mode.SUBTRACT)

    # Sketch27 → Cut-Extrude15 (cut)
    with BuildSketch(Plane.ZY.offset(-7.1755).offset(CUT_EXTRUDE15_START)):
        with Locations(Location((0, 5.08, 0), (0, 0, 180))):
            Circle(SKETCH27_R)
    extrude(amount=CUT_EXTRUDE15_DEPTH, mode=Mode.SUBTRACT)


solid = part.part
